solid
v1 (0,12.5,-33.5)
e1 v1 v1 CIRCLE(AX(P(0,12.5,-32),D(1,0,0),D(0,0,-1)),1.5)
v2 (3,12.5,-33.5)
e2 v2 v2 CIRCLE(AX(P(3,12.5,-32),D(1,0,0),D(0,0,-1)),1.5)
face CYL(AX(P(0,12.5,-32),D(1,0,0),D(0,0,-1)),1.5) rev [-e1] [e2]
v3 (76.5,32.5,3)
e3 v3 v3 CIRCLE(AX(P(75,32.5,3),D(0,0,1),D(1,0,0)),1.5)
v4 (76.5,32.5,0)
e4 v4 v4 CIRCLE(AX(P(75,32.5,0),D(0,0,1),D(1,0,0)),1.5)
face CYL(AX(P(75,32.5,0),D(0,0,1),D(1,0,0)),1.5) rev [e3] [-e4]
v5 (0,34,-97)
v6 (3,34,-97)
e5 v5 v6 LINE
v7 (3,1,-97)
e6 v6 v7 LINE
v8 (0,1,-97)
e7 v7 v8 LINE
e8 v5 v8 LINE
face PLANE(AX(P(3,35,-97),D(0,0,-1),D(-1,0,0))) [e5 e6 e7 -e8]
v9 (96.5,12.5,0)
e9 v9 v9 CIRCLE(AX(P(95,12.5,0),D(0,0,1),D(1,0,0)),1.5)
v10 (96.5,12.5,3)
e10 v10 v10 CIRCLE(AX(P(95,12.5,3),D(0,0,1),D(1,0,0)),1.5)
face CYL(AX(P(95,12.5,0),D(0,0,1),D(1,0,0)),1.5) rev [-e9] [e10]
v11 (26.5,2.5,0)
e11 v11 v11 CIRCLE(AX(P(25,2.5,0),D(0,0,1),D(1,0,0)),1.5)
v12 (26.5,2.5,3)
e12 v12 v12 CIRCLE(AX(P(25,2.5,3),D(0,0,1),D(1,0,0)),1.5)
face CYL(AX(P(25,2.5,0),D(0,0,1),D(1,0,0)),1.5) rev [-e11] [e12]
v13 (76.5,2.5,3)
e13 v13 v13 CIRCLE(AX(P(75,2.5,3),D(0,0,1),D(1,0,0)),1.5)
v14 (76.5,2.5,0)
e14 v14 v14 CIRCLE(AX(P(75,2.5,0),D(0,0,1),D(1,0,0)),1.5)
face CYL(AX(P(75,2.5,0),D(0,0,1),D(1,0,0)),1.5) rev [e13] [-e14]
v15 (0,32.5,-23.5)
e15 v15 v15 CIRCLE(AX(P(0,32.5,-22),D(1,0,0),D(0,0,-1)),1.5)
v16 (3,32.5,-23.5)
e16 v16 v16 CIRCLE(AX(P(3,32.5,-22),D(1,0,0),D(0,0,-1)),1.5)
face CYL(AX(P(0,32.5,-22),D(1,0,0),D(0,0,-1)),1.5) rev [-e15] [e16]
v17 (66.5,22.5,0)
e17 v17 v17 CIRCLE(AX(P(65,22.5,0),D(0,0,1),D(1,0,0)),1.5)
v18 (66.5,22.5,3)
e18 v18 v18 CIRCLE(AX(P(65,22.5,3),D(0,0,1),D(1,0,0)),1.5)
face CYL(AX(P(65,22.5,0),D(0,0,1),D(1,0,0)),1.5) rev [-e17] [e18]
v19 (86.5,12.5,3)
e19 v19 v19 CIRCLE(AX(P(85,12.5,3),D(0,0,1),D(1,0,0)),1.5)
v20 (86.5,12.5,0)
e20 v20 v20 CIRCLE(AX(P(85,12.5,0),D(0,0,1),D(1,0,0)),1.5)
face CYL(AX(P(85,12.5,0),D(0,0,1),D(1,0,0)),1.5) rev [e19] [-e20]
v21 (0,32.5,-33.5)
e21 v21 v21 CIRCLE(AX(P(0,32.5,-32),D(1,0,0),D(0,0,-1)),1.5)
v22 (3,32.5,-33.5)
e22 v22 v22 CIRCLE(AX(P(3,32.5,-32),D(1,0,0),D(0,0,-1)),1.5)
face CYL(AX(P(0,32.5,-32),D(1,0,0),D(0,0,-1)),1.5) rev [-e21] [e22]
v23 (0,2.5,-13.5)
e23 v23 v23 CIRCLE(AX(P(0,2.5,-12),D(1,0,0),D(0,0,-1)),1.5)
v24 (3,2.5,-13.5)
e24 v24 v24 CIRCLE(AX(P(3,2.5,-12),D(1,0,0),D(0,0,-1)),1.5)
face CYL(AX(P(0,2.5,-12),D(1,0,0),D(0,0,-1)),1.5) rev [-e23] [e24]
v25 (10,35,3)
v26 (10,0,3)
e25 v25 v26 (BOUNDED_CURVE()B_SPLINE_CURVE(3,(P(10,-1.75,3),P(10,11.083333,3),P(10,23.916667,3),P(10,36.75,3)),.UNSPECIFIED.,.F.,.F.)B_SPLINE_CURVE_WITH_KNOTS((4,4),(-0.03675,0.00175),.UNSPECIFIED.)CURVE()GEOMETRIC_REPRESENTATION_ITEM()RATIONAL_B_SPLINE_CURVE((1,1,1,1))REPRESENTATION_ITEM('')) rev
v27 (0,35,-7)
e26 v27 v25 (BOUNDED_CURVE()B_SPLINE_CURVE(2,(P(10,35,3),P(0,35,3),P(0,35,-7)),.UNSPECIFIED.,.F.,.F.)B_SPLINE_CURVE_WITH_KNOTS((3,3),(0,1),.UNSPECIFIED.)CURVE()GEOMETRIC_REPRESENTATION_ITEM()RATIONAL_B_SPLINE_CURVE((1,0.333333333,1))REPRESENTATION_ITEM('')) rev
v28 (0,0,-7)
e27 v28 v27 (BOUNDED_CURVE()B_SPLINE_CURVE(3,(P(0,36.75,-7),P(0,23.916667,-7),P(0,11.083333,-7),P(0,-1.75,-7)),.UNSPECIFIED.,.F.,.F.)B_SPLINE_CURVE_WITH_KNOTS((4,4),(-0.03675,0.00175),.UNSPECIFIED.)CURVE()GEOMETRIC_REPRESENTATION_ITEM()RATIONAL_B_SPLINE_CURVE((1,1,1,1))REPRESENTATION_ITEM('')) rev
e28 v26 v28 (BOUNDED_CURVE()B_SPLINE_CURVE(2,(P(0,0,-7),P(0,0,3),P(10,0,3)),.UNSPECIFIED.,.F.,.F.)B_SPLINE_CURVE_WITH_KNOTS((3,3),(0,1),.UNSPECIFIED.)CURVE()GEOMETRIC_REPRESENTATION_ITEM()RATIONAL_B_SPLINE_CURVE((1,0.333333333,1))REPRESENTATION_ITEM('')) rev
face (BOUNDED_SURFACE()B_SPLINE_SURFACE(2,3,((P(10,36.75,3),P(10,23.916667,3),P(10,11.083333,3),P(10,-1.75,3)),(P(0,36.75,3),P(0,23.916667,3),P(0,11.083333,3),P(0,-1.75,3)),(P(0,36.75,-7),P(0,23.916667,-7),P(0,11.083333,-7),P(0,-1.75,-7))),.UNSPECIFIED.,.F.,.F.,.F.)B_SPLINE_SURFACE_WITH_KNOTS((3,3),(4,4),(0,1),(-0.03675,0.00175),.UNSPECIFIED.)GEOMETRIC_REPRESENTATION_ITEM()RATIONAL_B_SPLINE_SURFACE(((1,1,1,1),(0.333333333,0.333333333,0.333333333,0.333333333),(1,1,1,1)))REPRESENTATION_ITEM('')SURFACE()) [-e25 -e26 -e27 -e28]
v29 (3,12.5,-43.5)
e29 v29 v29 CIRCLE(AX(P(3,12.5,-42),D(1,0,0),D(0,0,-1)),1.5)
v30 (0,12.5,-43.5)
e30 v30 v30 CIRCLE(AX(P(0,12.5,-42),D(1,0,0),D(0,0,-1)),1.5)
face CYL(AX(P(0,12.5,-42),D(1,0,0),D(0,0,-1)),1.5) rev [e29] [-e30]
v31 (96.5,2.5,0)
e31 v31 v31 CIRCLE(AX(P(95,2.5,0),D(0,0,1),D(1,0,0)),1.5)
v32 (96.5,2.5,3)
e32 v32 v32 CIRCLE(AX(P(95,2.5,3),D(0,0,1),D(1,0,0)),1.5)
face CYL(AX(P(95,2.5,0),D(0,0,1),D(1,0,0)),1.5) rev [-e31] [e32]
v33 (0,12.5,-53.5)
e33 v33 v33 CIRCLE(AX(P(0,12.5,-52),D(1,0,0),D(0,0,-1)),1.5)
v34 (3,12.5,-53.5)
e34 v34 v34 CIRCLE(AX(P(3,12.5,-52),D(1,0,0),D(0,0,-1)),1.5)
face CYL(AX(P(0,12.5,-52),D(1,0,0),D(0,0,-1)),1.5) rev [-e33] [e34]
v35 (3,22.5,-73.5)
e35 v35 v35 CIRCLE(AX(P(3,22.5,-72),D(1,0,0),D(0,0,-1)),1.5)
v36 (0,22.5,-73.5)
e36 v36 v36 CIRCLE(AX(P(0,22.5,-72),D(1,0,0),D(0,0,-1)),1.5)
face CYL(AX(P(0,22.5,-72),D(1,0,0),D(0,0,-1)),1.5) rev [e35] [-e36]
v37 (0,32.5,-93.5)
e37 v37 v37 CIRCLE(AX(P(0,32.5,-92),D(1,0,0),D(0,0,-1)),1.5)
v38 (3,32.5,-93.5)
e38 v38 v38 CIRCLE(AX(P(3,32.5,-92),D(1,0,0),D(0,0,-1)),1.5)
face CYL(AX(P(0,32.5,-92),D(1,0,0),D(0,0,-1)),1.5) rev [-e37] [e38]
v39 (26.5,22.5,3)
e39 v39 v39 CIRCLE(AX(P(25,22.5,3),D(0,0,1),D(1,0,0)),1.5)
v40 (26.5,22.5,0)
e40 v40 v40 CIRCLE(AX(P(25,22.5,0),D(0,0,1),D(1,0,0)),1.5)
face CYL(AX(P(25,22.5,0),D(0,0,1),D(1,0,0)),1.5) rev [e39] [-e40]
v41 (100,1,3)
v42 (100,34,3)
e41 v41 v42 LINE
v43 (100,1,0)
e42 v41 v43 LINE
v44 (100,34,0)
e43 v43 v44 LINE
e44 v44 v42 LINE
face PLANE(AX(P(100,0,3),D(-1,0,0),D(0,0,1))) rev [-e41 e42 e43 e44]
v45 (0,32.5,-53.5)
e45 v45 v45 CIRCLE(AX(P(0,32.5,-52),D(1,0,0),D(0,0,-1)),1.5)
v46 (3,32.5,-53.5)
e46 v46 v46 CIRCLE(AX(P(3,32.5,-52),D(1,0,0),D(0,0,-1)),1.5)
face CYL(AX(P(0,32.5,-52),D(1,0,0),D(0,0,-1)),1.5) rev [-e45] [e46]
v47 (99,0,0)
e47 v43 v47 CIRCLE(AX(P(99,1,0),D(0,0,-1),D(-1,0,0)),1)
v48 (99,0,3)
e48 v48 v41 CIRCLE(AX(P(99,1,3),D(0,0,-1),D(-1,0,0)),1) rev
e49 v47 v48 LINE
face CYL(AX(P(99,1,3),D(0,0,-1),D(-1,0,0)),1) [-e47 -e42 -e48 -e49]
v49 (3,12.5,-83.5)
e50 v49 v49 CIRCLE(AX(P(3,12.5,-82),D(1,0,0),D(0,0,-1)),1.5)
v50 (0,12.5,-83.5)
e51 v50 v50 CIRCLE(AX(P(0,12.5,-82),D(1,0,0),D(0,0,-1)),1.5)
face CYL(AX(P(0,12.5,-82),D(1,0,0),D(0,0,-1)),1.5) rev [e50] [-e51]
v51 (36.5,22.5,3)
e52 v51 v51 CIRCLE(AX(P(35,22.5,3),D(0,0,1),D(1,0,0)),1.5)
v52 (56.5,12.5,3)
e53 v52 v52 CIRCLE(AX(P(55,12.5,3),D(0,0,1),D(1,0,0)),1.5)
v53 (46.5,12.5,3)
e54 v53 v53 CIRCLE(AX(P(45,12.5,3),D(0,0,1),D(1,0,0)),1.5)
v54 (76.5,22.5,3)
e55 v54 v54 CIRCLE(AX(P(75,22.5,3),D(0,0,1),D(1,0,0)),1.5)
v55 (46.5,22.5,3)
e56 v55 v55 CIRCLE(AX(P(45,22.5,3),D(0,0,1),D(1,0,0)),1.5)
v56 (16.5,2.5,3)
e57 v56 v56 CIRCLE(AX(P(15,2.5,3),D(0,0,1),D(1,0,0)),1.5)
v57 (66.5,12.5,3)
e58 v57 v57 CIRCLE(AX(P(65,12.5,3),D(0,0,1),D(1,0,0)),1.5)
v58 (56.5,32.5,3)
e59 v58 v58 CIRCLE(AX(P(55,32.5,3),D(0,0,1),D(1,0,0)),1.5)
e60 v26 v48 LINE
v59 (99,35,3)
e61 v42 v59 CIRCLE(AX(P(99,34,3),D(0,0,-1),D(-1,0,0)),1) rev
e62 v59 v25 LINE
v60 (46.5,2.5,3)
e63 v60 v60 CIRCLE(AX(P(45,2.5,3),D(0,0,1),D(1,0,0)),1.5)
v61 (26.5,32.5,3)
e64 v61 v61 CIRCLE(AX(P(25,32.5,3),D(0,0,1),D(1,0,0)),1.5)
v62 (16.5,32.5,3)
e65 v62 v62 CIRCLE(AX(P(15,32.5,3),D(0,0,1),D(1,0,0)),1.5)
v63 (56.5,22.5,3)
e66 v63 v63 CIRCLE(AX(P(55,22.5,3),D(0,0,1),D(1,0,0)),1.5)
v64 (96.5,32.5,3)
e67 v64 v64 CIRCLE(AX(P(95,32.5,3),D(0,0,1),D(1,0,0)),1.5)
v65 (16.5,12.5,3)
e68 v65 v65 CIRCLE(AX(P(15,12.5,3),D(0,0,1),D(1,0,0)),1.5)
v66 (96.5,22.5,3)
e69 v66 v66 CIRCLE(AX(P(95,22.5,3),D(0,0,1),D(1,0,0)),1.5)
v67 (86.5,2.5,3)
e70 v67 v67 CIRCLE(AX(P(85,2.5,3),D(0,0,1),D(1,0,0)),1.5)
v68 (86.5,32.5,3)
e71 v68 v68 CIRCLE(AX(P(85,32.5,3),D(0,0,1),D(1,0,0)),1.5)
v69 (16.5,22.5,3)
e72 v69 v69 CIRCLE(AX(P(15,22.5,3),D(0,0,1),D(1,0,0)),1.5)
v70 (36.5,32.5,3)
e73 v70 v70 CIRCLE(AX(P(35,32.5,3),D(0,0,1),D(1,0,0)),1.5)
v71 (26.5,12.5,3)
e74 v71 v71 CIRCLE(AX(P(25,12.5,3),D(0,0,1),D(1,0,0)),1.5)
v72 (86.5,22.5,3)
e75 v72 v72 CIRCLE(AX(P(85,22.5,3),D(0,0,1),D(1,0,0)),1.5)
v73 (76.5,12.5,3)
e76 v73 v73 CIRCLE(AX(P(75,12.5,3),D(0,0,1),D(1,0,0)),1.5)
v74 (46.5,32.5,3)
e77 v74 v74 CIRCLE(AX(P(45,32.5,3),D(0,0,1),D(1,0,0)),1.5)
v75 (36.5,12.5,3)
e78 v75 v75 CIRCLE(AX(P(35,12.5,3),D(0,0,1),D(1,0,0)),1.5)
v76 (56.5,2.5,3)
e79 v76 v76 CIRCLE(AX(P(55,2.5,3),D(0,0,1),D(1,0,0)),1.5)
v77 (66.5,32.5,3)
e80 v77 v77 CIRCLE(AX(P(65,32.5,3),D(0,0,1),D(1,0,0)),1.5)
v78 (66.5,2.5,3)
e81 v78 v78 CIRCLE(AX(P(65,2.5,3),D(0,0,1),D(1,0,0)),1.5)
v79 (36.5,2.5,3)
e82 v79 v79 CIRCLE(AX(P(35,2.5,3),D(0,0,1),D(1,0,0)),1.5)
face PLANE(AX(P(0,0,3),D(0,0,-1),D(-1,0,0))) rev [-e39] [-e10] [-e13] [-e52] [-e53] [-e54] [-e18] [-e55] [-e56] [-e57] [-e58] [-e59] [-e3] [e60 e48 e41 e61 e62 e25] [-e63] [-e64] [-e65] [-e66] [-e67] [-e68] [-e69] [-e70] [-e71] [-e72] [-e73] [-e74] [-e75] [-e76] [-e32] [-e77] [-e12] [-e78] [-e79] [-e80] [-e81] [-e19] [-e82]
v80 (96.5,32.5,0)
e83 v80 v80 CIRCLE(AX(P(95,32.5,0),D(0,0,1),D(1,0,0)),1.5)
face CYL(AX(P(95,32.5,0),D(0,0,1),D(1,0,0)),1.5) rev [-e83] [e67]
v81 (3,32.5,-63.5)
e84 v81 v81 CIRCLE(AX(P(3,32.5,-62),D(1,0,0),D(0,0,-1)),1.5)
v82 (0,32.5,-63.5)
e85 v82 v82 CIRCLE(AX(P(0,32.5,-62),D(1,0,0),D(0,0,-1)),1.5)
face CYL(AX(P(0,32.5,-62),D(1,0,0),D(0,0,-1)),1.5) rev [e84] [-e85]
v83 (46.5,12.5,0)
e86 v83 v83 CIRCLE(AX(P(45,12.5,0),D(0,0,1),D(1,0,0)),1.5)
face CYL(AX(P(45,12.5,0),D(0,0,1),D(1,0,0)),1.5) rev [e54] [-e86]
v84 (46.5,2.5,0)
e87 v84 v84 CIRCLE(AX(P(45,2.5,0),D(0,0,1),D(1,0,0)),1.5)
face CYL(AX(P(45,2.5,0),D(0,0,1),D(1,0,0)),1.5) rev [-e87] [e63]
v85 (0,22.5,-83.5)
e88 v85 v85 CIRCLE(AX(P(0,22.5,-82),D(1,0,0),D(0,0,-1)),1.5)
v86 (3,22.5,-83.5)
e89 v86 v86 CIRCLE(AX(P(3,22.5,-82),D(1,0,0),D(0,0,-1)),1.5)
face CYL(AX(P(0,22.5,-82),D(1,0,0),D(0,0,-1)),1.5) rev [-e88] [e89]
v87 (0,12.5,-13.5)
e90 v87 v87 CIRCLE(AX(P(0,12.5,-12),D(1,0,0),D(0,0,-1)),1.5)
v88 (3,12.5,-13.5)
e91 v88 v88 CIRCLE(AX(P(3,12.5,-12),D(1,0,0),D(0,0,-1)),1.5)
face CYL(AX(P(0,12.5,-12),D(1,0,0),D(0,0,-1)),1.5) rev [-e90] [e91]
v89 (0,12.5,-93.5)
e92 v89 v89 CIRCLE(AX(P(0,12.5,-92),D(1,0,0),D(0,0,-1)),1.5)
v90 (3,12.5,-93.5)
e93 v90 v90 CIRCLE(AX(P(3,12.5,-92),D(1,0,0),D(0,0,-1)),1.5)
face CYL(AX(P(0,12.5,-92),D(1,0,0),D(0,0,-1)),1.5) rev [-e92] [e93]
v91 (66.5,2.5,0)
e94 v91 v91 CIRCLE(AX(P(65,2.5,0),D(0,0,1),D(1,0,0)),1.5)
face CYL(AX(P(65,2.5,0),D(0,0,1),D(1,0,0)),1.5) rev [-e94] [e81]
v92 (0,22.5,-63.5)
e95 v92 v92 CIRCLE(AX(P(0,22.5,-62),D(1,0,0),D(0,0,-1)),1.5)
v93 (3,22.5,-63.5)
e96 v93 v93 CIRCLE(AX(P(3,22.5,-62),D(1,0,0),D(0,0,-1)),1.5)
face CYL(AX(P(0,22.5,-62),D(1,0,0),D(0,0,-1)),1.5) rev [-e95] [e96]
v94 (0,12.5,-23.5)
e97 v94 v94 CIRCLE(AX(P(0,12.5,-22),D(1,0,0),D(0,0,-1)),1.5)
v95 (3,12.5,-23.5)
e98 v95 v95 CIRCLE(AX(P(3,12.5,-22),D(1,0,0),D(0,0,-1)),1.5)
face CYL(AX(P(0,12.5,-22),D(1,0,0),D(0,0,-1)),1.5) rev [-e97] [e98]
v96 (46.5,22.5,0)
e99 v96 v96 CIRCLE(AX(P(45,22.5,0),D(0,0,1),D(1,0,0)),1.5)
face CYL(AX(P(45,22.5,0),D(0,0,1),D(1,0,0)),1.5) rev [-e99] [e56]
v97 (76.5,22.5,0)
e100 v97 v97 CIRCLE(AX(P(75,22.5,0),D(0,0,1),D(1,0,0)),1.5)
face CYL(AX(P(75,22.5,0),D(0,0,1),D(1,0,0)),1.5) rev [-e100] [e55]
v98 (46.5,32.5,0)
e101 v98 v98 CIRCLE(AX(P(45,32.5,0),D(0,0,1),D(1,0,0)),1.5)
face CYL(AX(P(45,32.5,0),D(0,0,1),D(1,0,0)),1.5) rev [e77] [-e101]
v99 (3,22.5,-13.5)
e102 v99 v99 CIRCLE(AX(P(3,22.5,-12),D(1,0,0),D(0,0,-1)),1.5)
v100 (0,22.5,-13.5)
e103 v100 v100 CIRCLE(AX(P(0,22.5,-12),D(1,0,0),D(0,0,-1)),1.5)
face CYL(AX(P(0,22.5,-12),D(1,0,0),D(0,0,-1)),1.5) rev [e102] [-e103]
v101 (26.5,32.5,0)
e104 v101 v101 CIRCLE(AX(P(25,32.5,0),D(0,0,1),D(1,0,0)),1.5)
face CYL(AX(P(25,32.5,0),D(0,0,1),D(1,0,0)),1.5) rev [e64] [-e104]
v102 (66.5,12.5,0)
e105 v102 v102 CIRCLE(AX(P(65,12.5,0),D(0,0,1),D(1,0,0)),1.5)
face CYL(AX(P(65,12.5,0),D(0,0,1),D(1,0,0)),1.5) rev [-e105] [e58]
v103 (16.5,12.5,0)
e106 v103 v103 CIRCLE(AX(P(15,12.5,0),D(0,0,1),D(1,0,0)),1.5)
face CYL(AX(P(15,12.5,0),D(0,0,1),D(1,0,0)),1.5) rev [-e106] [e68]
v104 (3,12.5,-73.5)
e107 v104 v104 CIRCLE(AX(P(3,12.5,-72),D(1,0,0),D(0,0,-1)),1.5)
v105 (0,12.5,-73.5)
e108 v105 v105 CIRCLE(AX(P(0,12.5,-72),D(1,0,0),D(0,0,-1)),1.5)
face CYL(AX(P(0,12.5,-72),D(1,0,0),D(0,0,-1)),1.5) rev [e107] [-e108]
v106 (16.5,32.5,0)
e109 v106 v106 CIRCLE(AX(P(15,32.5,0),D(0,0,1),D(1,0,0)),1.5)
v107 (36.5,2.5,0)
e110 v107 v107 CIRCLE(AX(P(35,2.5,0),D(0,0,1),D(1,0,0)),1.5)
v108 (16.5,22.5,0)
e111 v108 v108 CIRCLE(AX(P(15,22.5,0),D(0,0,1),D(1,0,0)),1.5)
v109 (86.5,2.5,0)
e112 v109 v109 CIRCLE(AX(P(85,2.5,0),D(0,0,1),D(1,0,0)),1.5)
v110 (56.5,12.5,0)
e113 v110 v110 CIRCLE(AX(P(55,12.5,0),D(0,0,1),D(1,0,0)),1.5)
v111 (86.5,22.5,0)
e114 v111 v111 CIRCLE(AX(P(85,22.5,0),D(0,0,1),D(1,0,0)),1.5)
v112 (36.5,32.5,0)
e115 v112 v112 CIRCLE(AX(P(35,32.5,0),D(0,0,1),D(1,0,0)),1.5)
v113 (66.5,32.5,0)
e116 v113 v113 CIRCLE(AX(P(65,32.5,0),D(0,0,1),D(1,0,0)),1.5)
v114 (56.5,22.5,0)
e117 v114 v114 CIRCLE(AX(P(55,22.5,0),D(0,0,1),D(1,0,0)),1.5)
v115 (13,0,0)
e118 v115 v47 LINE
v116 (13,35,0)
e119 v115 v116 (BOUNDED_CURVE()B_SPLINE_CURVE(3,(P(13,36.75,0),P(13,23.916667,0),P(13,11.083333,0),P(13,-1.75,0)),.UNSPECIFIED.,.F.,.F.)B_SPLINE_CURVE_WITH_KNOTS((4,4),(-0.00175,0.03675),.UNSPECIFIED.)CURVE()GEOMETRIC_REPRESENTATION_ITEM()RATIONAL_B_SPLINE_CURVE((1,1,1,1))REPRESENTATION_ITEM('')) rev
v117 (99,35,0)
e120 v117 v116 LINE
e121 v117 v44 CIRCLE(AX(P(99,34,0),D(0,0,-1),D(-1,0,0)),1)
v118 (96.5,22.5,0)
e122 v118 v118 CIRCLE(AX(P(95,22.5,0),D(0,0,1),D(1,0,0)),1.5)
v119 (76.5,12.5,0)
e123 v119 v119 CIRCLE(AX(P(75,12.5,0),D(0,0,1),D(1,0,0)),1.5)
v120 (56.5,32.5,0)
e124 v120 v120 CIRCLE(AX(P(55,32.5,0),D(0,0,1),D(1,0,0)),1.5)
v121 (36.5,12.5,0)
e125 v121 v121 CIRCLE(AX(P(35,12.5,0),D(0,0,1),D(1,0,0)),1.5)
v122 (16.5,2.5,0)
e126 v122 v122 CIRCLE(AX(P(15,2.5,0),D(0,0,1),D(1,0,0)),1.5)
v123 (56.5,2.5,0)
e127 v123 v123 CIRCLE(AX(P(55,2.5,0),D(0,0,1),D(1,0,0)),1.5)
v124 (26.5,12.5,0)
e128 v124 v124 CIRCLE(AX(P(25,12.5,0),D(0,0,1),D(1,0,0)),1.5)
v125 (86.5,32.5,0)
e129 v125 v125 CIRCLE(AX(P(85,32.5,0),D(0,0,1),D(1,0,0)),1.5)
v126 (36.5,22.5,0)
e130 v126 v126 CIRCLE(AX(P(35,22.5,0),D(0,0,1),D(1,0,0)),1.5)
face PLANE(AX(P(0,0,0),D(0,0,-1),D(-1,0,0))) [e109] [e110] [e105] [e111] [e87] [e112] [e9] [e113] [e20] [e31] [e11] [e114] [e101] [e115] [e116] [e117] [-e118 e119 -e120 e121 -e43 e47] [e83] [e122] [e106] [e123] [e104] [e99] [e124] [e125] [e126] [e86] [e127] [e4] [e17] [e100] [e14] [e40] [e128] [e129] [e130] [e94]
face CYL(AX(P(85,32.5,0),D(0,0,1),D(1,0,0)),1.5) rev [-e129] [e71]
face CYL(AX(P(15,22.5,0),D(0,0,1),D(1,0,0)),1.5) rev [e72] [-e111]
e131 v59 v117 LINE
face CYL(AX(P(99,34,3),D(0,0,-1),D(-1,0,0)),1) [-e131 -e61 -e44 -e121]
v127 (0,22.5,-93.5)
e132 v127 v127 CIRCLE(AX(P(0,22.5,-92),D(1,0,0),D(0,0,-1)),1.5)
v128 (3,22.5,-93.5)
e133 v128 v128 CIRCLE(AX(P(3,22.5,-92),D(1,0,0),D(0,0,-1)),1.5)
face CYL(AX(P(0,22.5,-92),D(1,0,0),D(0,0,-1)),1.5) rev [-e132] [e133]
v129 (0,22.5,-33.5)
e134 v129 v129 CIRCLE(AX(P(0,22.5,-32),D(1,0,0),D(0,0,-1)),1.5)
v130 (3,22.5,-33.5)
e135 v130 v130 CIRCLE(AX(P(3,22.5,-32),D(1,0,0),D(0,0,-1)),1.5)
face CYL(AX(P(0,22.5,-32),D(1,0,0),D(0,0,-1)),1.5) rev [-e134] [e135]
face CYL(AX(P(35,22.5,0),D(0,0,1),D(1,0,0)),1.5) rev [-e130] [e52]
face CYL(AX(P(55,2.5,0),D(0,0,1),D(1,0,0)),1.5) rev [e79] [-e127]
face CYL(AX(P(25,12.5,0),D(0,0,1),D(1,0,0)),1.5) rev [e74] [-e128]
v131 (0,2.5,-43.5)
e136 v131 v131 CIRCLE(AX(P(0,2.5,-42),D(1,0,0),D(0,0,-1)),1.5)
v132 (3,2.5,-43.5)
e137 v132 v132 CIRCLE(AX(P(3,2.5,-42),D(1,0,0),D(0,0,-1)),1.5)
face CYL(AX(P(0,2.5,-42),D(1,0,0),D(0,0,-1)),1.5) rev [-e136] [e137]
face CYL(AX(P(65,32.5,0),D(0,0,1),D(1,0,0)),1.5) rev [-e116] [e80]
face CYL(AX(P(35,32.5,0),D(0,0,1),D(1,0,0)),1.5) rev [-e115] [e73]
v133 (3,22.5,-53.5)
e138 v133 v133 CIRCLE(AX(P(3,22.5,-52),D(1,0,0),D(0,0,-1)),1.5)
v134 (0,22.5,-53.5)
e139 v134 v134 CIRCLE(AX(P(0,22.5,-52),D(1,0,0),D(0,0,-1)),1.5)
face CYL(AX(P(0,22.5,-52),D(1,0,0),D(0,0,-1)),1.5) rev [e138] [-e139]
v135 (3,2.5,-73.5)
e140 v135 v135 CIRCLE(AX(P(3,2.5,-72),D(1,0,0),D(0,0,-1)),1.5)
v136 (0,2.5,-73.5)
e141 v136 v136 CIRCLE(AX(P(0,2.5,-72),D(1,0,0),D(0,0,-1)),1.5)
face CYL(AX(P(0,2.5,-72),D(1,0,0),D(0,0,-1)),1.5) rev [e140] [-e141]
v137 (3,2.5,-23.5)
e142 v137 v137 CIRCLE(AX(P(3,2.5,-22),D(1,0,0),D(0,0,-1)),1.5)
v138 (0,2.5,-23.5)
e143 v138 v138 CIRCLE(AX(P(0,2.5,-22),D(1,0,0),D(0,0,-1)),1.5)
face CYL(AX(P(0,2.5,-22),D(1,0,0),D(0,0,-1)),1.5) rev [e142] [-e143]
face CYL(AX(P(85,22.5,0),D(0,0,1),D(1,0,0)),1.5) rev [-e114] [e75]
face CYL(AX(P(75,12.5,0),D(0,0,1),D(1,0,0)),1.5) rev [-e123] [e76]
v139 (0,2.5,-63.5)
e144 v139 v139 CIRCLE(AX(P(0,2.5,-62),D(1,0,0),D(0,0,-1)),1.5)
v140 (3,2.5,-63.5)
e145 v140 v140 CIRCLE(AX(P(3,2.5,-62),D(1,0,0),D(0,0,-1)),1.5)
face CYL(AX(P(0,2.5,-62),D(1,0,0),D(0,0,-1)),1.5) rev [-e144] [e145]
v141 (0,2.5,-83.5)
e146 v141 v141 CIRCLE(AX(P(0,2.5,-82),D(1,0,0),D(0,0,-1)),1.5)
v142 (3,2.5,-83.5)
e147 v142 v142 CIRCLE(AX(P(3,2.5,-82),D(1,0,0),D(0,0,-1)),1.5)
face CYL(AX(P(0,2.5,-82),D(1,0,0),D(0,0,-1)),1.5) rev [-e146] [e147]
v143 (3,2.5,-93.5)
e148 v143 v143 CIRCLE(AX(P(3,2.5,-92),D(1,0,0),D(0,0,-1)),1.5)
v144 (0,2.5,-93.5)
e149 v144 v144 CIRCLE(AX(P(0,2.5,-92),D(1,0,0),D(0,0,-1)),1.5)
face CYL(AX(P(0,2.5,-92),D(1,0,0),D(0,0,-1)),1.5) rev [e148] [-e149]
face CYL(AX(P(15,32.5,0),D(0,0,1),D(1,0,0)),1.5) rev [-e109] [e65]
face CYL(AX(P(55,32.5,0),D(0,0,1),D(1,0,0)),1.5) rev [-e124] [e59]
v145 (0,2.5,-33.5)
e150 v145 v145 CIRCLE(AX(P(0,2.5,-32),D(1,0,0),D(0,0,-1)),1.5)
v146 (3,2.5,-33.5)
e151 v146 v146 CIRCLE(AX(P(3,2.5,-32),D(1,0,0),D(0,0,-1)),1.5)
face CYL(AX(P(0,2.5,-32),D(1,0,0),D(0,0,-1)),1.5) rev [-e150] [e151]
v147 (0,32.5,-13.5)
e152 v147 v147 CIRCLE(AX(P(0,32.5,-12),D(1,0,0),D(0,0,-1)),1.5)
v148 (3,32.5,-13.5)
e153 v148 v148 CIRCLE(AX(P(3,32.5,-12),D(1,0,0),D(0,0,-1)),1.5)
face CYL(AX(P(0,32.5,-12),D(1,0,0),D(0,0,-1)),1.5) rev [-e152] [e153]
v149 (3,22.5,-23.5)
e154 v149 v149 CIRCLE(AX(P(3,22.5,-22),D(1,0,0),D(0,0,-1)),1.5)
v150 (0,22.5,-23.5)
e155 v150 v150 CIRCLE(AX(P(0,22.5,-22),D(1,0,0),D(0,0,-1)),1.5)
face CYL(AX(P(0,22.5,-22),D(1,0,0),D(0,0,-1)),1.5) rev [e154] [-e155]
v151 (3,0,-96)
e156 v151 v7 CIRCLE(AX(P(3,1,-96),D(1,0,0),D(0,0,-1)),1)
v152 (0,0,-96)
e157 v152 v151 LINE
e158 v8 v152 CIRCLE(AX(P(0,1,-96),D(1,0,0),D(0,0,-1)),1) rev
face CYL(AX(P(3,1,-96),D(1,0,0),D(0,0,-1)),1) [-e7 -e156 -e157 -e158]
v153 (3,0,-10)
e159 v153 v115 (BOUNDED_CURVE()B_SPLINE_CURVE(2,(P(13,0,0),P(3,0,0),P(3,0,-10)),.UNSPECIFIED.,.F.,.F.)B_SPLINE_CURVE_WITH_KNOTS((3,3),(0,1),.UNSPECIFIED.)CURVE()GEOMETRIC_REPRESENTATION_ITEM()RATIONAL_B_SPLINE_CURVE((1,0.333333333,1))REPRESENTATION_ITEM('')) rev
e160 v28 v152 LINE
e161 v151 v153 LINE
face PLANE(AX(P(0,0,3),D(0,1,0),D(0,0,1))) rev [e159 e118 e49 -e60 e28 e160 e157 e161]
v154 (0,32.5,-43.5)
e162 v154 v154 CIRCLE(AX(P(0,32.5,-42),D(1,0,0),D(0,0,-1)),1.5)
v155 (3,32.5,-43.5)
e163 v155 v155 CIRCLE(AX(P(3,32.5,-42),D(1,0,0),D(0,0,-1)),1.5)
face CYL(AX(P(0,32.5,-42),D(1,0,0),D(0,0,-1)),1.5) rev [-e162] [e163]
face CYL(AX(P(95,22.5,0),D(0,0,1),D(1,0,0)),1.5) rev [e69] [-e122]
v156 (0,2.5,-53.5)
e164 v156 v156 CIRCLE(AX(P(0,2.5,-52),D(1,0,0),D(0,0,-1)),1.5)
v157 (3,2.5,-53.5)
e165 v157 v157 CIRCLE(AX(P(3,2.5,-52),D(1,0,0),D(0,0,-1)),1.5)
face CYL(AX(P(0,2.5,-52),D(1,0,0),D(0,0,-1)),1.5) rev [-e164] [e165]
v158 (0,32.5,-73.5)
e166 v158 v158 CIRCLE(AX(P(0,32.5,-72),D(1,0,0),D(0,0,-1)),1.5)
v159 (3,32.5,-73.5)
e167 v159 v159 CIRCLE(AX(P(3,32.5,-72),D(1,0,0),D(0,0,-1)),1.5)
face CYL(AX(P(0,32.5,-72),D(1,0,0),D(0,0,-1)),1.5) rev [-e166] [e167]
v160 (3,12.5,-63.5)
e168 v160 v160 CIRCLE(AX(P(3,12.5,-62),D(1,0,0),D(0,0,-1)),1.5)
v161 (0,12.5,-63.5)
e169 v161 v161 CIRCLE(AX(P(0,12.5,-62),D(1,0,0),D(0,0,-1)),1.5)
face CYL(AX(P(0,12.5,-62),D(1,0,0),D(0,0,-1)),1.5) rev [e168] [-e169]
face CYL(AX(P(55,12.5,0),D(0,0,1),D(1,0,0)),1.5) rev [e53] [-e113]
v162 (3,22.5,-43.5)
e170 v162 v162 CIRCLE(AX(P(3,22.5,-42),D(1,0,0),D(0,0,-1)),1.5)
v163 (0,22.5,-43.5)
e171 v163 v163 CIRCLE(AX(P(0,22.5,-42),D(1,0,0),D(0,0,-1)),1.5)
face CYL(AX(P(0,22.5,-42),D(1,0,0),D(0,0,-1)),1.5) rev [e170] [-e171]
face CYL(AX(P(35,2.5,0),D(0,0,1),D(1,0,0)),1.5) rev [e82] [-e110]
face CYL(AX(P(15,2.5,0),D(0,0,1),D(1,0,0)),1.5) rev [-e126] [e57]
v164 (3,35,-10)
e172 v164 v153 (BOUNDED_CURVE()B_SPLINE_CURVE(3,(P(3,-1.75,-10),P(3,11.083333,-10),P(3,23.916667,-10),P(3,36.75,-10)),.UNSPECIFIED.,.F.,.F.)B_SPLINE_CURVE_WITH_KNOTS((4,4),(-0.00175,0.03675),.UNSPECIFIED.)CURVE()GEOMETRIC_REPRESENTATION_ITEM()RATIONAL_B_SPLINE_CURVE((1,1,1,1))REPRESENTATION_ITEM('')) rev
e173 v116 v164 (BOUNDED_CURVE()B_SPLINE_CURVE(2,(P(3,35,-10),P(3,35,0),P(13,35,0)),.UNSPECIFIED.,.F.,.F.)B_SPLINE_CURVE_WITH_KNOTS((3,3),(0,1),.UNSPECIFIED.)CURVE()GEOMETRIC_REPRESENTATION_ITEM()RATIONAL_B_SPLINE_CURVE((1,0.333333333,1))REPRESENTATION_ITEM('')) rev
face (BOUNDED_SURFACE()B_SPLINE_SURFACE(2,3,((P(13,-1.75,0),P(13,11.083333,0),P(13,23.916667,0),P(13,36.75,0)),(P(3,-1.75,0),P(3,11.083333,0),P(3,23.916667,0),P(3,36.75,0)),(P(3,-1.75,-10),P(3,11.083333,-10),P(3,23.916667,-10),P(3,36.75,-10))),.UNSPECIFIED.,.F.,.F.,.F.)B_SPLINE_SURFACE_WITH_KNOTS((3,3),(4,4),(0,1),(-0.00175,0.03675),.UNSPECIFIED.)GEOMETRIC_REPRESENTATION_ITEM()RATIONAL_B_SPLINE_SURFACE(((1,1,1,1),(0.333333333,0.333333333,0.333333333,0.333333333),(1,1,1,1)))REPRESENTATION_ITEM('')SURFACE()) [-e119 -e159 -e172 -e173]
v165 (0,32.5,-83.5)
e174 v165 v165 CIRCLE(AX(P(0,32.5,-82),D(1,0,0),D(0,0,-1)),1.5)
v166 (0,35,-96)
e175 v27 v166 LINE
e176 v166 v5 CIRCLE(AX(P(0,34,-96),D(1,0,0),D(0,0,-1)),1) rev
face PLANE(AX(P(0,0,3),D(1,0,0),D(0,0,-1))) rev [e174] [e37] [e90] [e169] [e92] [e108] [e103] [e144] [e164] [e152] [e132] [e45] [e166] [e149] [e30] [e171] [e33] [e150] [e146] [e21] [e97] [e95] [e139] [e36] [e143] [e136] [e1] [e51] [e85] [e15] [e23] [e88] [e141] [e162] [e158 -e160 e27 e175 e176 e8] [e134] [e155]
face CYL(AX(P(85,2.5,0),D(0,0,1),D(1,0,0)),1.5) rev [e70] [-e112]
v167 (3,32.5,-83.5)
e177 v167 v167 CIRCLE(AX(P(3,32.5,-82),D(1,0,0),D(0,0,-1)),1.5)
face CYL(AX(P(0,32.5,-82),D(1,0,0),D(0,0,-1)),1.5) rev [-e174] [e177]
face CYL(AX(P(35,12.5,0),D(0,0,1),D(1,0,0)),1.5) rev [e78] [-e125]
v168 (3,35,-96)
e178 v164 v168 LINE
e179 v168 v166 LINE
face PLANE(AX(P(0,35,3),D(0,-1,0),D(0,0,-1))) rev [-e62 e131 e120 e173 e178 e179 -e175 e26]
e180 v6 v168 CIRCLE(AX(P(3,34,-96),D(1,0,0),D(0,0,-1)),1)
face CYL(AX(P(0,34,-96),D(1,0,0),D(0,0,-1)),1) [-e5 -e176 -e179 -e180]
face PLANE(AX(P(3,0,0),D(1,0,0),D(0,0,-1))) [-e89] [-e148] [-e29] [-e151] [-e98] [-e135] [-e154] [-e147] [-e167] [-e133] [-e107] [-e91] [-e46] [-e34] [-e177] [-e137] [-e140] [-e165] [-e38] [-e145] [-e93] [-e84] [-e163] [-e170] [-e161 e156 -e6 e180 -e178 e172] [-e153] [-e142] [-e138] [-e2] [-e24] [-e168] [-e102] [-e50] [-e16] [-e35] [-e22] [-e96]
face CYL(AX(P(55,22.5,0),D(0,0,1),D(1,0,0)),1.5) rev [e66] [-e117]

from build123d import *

# Parameters (mm, degrees)
ESQUISSE1_W             = 100
ESQUISSE1_H             = 35
BOSS_EXTRU_1_DEPTH      = 3
ESQUISSE2_R             = 1.5
ENL_V_MAT_EXTRU_1_DEPTH = 3
ESQUISSE5_W             = 100
ESQUISSE5_H             = 35
BOSS_EXTRU_2_DEPTH      = 3
ESQUISSE6_R             = 1.5
ENL_V_MAT_EXTRU_2_DEPTH = 3
CONG_1_SIZE             = 10
CONG_2_R                = 1


with BuildPart() as part:
    # Esquisse1 → Boss.-Extru.1 (new body)
    with BuildSketch(Plane.XY):
        with Locations((50, 17.5)):
            Rectangle(ESQUISSE1_W, ESQUISSE1_H)
    extrude(amount=BOSS_EXTRU_1_DEPTH)

    # Esquisse2 → Enlèv. mat.-Extru.1 (cut)
    with BuildSketch(Plane.XY.offset(3)):
        with Locations((95, 32.5)):
            Circle(ESQUISSE2_R)
        with Locations((85, 32.5)):
            Circle(ESQUISSE2_R)
        with Locations((75, 32.5)):
            Circle(ESQUISSE2_R)
        with Locations((65, 32.5)):
            Circle(ESQUISSE2_R)
        with Locations((55, 32.5)):
            Circle(ESQUISSE2_R)
        with Locations((45, 32.5)):
            Circle(ESQUISSE2_R)
        with Locations((35, 32.5)):
            Circle(ESQUISSE2_R)
        with Locations((25, 32.5)):
            Circle(ESQUISSE2_R)
        with Locations((15, 32.5)):
            Circle(ESQUISSE2_R)
        with Locations((85, 22.5)):
            Circle(ESQUISSE2_R)
        with Locations((75, 22.5)):
            Circle(ESQUISSE2_R)
        with Locations((65, 22.5)):
            Circle(ESQUISSE2_R)
        with Locations((55, 22.5)):
            Circle(ESQUISSE2_R)
        with Locations((45, 22.5)):
            Circle(ESQUISSE2_R)
        with Locations((35, 22.5)):
            Circle(ESQUISSE2_R)
        with Locations((25, 22.5)):
            Circle(ESQUISSE2_R)
        with Locations((15, 22.5)):
            Circle(ESQUISSE2_R)
        with Locations((85, 12.5)):
            Circle(ESQUISSE2_R)
        with Locations((75, 12.5)):
            Circle(ESQUISSE2_R)
        with Locations((65, 12.5)):
            Circle(ESQUISSE2_R)
        with Locations((55, 12.5)):
            Circle(ESQUISSE2_R)
        with Locations((45, 12.5)):
            Circle(ESQUISSE2_R)
        with Locations((35, 12.5)):
            Circle(ESQUISSE2_R)
        with Locations((25, 12.5)):
            Circle(ESQUISSE2_R)
        with Locations((15, 12.5)):
            Circle(ESQUISSE2_R)
        with Locations((85, 2.5)):
            Circle(ESQUISSE2_R)
        with Locations((75, 2.5)):
            Circle(ESQUISSE2_R)
        with Locations((65, 2.5)):
            Circle(ESQUISSE2_R)
        with Locations((55, 2.5)):
            Circle(ESQUISSE2_R)
        with Locations((45, 2.5)):
            Circle(ESQUISSE2_R)
        with Locations((35, 2.5)):
            Circle(ESQUISSE2_R)
        with Locations((25, 2.5)):
            Circle(ESQUISSE2_R)
        with Locations((15, 2.5)):
            Circle(ESQUISSE2_R)
        with Locations((95, 22.5)):
            Circle(ESQUISSE2_R)
        with Locations((95, 12.5)):
            Circle(ESQUISSE2_R)
        with Locations((95, 2.5)):
            Circle(ESQUISSE2_R)
    extrude(amount=-ENL_V_MAT_EXTRU_1_DEPTH, mode=Mode.SUBTRACT)

    # Esquisse5 → Boss.-Extru.2 (add)
    with BuildSketch(Plane.ZY):
        with Locations((-47, 17.5)):
            Rectangle(ESQUISSE5_W, ESQUISSE5_H)
    extrude(amount=-BOSS_EXTRU_2_DEPTH)

    # Esquisse6 → Enlèv. mat.-Extru.2 (cut)
    with BuildSketch(Plane(origin=(3, 0, 0), x_dir=(0, 0, -1), z_dir=(1, 0, 0))):
        with Locations((92, 32.5)):
            Circle(ESQUISSE6_R)
        with Locations((82, 32.5)):
            Circle(ESQUISSE6_R)
        with Locations((72, 32.5)):
            Circle(ESQUISSE6_R)
        with Locations((62, 32.5)):
            Circle(ESQUISSE6_R)
        with Locations((52, 32.5)):
            Circle(ESQUISSE6_R)
        with Locations((42, 32.5)):
            Circle(ESQUISSE6_R)
        with Locations((32, 32.5)):
            Circle(ESQUISSE6_R)
        with Locations((22, 32.5)):
            Circle(ESQUISSE6_R)
        with Locations((12, 32.5)):
            Circle(ESQUISSE6_R)
        with Locations((82, 22.5)):
            Circle(ESQUISSE6_R)
        with Locations((72, 22.5)):
            Circle(ESQUISSE6_R)
        with Locations((62, 22.5)):
            Circle(ESQUISSE6_R)
        with Locations((52, 22.5)):
            Circle(ESQUISSE6_R)
        with Locations((42, 22.5)):
            Circle(ESQUISSE6_R)
        with Locations((32, 22.5)):
            Circle(ESQUISSE6_R)
        with Locations((22, 22.5)):
            Circle(ESQUISSE6_R)
        with Locations((12, 22.5)):
            Circle(ESQUISSE6_R)
        with Locations((82, 12.5)):
            Circle(ESQUISSE6_R)
        with Locations((72, 12.5)):
            Circle(ESQUISSE6_R)
        with Locations((62, 12.5)):
            Circle(ESQUISSE6_R)
        with Locations((52, 12.5)):
            Circle(ESQUISSE6_R)
        with Locations((42, 12.5)):
            Circle(ESQUISSE6_R)
        with Locations((32, 12.5)):
            Circle(ESQUISSE6_R)
        with Locations((22, 12.5)):
            Circle(ESQUISSE6_R)
        with Locations((12, 12.5)):
            Circle(ESQUISSE6_R)
        with Locations((82, 2.5)):
            Circle(ESQUISSE6_R)
        with Locations((72, 2.5)):
            Circle(ESQUISSE6_R)
        with Locations((62, 2.5)):
            Circle(ESQUISSE6_R)
        with Locations((52, 2.5)):
            Circle(ESQUISSE6_R)
        with Locations((42, 2.5)):
            Circle(ESQUISSE6_R)
        with Locations((32, 2.5)):
            Circle(ESQUISSE6_R)
        with Locations((22, 2.5)):
            Circle(ESQUISSE6_R)
        with Locations((12, 2.5)):
            Circle(ESQUISSE6_R)
        with Locations((92, 22.5)):
            Circle(ESQUISSE6_R)
        with Locations((92, 12.5)):
            Circle(ESQUISSE6_R)
        with Locations((92, 2.5)):
            Circle(ESQUISSE6_R)
    extrude(amount=-ENL_V_MAT_EXTRU_2_DEPTH, mode=Mode.SUBTRACT)

    # Congé1
    # a fillet whose section is not a circle: 10 mm, written as the material it adds along each edge
    with BuildSketch(Plane(origin=(3, 35, 0), x_dir=(1, 0, 0), z_dir=(0, -1, 0))) as cong_1_piece_1:
        with BuildLine():
            Bezier((CONG_1_SIZE, 0), (0, 0), (0, -CONG_1_SIZE), weights=[1, 0.333333333, 1])
            Line((0, -CONG_1_SIZE), (0, 0))
            Line((0, 0), (CONG_1_SIZE, 0))
        make_face()
    extrude(amount=35)
    # a fillet whose section is not a circle: 10 mm, written as the material it takes off along each edge
    with BuildSketch(Plane(origin=(0, 60, 3), x_dir=(1, 0, 0), z_dir=(0, -1, 0))) as cong_1_2_piece_1:
        with BuildLine():
            Bezier((CONG_1_SIZE, 0), (0, 0), (0, -CONG_1_SIZE), weights=[1, 0.333333333, 1])
            Line((0, -CONG_1_SIZE), (0, 0))
            Line((0, 0), (CONG_1_SIZE, 0))
        make_face()
    extrude(amount=85, mode=Mode.SUBTRACT)

    # Congé2
    cong_2_edges = [part.edges().sort_by_distance(p)[0] for p in [
        (100, 35, 1.5),
        (100, 0, 1.5),
        (1.5, 0, -97),
        (1.5, 35, -97),
    ]]
    fillet(cong_2_edges, radius=CONG_2_R)


solid = part.part
